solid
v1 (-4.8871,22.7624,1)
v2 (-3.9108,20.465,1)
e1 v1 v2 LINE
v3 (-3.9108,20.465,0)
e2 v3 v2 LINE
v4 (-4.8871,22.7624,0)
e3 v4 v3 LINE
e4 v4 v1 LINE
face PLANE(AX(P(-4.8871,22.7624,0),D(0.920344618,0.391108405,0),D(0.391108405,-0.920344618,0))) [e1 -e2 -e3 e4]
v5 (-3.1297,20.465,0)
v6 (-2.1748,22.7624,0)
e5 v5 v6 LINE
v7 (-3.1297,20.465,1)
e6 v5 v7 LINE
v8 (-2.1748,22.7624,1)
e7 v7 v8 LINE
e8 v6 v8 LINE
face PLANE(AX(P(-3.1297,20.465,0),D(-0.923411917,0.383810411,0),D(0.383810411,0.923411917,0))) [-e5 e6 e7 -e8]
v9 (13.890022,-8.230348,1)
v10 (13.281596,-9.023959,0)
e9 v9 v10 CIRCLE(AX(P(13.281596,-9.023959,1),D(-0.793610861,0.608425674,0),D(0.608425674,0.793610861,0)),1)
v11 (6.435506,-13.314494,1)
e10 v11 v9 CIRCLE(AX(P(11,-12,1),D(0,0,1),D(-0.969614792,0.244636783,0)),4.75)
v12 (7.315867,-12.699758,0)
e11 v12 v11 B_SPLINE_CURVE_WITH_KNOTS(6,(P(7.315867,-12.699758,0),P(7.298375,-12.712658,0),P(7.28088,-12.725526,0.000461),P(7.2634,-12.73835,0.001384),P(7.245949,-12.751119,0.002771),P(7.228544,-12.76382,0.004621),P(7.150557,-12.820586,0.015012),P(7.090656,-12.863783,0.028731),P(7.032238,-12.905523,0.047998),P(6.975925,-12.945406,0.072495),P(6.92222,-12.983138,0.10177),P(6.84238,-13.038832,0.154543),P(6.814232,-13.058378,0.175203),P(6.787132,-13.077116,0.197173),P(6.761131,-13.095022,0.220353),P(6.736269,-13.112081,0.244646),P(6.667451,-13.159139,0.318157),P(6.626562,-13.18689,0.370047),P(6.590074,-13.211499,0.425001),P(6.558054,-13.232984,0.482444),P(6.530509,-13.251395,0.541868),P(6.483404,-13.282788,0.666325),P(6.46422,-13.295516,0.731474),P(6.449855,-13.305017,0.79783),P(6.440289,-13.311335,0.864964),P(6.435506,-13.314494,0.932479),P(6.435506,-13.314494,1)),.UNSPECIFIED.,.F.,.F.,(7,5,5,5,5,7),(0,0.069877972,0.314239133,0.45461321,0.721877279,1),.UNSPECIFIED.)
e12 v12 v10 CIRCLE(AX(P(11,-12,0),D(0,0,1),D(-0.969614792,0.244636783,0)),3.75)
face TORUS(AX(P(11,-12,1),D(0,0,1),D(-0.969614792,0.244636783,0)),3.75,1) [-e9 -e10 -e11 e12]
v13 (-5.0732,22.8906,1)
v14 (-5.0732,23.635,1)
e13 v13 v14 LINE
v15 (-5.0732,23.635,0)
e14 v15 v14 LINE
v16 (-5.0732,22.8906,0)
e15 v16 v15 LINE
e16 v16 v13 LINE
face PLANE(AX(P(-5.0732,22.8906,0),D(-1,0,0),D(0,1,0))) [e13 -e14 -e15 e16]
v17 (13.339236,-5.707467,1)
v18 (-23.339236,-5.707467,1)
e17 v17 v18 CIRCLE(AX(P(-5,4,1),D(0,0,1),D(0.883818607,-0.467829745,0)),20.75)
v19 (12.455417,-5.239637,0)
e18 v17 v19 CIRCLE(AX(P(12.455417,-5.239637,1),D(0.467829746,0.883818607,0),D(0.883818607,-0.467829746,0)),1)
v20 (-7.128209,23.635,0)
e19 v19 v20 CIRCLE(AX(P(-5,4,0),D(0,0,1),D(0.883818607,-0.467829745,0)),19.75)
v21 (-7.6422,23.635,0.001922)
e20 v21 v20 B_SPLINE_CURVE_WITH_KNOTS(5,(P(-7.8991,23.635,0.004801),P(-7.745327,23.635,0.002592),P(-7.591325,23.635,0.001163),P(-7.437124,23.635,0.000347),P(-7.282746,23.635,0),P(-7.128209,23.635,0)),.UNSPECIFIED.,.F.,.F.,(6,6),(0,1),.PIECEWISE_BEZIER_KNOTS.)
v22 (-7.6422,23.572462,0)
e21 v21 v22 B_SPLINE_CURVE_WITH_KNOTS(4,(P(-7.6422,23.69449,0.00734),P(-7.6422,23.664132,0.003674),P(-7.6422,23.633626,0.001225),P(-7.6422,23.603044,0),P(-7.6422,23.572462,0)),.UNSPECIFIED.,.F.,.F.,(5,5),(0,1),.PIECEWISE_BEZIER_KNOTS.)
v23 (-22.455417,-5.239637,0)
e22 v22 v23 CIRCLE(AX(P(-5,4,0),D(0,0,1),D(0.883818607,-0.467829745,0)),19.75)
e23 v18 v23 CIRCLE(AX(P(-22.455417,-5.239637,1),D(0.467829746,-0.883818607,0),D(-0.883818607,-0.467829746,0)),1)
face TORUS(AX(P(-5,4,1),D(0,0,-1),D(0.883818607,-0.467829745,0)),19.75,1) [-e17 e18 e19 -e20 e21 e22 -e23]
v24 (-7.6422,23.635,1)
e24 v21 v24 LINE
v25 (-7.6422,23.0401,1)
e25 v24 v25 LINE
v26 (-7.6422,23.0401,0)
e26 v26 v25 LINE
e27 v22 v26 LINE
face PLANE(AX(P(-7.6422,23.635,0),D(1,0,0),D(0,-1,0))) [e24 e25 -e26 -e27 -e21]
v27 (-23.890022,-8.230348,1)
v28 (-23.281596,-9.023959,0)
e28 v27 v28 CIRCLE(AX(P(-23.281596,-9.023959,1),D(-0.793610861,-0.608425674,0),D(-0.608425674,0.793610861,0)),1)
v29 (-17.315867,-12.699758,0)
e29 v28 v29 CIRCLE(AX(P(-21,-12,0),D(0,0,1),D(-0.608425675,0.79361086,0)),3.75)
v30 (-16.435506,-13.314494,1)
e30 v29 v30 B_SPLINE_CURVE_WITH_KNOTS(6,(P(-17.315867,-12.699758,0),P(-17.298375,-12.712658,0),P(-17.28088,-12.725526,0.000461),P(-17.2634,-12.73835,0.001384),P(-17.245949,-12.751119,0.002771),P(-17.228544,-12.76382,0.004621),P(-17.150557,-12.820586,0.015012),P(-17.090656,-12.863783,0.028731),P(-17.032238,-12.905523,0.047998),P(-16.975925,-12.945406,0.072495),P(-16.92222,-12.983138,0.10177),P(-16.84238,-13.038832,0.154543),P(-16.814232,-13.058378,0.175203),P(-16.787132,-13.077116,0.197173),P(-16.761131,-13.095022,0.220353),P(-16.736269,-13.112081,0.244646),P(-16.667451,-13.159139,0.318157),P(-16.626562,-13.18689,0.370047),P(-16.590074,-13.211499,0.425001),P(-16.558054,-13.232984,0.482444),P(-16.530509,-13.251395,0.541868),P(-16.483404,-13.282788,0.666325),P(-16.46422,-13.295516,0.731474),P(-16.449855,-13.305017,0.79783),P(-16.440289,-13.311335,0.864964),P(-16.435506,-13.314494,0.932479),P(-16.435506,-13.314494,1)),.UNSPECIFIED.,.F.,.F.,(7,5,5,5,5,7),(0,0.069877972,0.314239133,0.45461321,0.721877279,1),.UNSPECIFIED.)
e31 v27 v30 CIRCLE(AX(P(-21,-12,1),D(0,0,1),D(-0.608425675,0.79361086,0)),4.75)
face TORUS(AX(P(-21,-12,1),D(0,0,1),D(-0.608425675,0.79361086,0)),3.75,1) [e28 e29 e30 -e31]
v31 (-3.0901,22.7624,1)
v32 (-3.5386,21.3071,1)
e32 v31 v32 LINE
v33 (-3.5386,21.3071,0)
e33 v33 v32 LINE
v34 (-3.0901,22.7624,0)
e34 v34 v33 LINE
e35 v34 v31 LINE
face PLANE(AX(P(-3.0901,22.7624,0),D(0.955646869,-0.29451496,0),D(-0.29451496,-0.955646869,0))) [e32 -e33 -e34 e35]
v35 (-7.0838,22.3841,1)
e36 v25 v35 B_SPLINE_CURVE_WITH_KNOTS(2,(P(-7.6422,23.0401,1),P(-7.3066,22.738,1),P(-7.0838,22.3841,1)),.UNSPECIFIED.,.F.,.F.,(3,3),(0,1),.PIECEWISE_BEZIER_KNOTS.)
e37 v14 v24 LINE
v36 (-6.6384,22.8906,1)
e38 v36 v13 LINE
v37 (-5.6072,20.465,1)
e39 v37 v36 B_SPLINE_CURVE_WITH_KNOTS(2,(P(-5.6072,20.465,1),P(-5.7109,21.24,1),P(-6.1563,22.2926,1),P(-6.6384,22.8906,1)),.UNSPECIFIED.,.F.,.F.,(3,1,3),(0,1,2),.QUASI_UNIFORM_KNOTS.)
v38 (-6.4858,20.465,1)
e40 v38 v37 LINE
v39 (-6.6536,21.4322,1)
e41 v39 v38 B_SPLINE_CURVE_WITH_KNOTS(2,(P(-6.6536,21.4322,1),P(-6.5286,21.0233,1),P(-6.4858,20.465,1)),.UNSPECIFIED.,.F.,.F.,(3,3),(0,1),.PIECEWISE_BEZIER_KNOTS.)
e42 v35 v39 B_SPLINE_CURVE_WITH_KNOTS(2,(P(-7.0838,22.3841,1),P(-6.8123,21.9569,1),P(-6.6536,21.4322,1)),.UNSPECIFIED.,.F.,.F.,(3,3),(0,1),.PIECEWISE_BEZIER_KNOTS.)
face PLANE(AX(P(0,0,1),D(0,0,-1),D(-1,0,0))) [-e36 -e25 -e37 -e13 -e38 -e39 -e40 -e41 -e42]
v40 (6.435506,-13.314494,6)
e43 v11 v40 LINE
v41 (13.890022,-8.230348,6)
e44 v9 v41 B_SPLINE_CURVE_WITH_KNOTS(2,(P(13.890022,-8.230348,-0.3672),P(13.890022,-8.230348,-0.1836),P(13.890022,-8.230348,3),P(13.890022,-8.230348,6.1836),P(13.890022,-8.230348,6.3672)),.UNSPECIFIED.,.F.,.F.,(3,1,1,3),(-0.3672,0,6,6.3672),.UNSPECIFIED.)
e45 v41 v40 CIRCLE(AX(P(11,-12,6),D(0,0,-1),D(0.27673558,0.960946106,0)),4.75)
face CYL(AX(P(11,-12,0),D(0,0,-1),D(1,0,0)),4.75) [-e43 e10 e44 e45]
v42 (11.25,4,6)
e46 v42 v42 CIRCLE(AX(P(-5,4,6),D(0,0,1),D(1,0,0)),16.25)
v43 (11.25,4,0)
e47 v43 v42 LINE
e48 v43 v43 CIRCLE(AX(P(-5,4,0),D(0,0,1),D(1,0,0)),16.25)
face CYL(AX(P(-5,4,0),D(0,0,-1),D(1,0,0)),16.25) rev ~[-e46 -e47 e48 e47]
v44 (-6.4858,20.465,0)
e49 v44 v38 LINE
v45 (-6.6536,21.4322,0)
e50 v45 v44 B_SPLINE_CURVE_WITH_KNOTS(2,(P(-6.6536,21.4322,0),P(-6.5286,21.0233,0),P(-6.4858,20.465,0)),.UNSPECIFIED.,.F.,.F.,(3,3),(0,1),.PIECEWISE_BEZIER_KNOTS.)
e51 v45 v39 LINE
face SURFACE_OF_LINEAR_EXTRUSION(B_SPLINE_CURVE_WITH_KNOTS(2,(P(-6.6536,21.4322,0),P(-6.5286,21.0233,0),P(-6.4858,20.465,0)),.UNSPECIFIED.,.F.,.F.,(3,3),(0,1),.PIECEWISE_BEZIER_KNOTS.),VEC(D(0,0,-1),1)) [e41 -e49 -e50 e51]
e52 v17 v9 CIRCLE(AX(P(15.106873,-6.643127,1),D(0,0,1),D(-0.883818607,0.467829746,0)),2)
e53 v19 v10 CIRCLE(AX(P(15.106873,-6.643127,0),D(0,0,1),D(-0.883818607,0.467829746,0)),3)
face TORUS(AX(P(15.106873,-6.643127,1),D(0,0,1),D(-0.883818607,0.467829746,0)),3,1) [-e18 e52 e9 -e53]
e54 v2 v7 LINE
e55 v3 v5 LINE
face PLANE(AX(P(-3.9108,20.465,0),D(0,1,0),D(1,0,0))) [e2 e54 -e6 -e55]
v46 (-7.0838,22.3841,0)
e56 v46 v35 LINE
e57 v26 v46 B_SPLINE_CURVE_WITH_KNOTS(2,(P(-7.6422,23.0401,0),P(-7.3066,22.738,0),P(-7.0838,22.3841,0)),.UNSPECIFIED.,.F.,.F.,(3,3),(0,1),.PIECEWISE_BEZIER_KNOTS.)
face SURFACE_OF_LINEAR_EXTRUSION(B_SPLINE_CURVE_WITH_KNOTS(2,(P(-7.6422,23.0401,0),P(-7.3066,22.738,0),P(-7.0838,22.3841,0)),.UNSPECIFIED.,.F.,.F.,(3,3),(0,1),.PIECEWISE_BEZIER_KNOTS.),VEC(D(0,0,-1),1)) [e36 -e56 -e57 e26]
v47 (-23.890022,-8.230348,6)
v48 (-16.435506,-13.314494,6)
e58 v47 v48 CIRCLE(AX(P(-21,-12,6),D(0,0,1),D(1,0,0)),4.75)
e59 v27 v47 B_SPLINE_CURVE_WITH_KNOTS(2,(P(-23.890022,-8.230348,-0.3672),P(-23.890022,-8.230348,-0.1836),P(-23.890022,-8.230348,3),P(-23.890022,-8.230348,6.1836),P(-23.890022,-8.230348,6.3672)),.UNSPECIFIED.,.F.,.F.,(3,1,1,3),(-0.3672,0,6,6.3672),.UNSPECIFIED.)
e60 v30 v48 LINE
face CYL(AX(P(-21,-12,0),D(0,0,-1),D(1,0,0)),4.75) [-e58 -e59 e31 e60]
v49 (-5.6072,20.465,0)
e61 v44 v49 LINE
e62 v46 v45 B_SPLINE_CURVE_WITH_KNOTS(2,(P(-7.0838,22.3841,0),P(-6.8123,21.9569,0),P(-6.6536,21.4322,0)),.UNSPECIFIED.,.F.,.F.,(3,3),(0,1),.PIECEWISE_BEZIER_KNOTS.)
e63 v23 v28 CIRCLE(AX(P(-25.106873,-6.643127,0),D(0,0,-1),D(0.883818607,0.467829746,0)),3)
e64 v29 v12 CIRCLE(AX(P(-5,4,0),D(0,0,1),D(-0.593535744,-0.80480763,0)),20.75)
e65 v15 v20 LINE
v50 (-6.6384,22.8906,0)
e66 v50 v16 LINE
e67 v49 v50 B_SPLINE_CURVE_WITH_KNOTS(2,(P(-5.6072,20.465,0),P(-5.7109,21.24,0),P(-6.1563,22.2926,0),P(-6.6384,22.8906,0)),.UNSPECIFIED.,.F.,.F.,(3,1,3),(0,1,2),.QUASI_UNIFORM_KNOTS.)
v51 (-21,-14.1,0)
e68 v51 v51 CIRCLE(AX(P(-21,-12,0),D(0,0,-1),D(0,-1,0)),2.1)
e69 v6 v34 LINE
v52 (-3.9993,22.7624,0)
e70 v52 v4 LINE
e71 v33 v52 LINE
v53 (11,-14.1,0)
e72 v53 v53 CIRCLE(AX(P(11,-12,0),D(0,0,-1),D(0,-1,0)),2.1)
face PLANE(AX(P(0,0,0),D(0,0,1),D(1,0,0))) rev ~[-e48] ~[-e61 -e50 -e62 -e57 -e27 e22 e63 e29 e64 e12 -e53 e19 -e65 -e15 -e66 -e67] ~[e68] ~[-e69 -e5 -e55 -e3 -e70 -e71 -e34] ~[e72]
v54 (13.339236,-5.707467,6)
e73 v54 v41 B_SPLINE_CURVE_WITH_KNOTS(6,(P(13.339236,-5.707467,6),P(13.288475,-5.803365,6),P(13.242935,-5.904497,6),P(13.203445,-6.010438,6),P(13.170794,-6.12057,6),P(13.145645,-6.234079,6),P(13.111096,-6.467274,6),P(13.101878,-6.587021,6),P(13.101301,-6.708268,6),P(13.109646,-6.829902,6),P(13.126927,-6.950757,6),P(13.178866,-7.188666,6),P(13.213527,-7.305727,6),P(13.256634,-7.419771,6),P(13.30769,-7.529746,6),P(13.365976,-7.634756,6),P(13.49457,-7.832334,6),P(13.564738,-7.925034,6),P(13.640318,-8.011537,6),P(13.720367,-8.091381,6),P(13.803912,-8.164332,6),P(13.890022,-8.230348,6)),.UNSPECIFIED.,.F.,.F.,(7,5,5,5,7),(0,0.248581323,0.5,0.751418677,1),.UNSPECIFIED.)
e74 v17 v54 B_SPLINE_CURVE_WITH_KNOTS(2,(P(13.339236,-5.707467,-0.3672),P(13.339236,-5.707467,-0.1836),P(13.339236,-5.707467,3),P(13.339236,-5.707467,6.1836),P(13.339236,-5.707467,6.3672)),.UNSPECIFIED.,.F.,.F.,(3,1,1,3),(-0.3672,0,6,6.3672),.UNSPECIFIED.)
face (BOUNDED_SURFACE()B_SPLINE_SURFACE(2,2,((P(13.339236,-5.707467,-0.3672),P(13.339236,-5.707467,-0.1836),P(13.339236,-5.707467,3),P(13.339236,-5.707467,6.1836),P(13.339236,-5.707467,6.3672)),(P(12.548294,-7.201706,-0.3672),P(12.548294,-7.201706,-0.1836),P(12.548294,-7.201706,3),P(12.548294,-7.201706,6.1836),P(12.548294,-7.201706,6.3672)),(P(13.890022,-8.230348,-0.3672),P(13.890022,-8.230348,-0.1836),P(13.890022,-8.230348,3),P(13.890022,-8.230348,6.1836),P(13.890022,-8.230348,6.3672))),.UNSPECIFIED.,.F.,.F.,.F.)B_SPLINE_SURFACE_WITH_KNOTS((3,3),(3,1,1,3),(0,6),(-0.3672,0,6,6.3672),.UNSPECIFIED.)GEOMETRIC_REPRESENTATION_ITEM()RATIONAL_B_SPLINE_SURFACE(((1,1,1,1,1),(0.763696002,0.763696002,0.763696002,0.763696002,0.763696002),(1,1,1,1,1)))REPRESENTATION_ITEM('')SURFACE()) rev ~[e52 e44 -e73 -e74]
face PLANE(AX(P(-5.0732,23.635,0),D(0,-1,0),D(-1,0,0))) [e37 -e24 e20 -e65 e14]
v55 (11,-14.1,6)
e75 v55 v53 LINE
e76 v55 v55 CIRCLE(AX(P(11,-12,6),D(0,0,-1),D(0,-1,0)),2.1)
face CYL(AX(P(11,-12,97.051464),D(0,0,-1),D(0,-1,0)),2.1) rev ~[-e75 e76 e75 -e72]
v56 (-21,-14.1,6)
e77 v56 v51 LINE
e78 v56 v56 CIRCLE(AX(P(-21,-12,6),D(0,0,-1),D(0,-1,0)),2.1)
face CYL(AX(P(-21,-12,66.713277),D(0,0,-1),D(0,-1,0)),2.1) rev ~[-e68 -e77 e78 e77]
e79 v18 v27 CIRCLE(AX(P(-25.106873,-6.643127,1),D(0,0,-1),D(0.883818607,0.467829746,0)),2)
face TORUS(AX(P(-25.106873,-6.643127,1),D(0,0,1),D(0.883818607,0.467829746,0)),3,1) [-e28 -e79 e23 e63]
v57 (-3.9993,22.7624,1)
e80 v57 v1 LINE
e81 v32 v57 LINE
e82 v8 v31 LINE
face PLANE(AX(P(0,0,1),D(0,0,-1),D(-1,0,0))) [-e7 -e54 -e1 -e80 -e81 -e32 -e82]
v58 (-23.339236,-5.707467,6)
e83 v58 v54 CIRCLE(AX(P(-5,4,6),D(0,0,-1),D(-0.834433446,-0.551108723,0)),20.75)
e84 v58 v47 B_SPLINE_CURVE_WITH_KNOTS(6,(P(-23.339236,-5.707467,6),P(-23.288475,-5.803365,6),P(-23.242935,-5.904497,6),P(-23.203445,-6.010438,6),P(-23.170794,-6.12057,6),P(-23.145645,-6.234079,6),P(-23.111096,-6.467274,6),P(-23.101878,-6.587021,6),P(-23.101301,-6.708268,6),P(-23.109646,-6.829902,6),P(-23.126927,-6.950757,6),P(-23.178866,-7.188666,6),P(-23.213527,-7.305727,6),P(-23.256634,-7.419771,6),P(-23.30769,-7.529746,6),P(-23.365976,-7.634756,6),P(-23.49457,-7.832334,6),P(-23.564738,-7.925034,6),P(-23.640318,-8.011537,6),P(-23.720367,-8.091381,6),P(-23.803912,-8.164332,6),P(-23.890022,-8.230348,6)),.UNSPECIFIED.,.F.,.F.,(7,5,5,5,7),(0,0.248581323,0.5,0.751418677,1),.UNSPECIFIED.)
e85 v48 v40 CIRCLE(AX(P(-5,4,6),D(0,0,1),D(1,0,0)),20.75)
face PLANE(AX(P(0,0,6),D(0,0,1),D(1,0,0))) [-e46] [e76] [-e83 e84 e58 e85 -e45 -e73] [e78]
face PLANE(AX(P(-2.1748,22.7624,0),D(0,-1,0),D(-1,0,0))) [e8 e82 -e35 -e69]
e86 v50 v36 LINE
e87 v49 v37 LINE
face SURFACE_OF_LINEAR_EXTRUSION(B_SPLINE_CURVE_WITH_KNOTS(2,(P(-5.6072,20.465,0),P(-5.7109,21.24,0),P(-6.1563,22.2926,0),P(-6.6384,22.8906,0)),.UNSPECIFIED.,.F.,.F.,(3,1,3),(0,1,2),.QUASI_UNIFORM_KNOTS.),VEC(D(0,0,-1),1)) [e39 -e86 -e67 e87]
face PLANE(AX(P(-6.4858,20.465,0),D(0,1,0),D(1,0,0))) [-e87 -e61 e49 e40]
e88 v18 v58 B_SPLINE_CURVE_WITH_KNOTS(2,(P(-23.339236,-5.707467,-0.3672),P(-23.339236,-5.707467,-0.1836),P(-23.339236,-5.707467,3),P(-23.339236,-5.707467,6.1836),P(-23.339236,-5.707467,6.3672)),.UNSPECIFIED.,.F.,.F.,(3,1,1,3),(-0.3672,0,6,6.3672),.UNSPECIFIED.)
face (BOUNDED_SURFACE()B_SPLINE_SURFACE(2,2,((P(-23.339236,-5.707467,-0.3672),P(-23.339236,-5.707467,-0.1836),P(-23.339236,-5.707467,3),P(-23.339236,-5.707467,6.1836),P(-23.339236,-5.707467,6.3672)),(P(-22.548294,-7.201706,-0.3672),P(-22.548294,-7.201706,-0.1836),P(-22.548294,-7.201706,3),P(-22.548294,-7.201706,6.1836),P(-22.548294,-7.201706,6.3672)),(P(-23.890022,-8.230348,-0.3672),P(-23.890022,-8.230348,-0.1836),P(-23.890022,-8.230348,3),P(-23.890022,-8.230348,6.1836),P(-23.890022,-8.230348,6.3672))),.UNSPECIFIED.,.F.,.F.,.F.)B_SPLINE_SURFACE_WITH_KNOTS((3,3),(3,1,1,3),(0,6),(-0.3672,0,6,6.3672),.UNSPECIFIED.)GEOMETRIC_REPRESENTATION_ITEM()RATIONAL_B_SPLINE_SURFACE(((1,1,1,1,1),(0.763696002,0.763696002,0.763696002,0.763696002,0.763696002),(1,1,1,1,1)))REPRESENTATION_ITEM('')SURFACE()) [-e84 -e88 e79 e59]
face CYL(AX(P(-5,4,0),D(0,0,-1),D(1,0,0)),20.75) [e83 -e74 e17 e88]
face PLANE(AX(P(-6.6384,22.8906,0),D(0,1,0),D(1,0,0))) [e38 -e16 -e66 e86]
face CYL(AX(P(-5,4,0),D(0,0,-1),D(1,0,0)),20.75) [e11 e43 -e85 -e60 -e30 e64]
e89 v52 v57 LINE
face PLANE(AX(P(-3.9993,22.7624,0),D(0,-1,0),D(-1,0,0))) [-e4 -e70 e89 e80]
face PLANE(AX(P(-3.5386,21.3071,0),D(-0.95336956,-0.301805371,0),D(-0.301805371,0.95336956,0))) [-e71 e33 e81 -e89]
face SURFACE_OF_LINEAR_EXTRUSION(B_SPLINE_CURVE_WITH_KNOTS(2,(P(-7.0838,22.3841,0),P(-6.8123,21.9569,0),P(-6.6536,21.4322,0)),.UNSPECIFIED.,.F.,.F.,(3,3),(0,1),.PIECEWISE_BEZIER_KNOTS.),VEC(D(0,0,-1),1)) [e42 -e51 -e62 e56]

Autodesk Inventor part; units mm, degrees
ref_plane "YZ Plane" through (0, 0, 0) normal (1, 0, 0) x (0, 1, 0)
ref_plane "XZ Plane" through (0, 0, 0) normal (0, 1, 0) x (-1, 0, 0)
sketch "Sketch1: base" plane through (0, 0, 0) normal (0, 0, 1) x (1, 0, 0)
  circle A0 centre (-5, 4) radius 16.25
  circle A1 centre (-5, 4) radius 20.75
  circle A2 centre (-21, -12) radius 4.75
  circle A3 centre (11, -12) radius 4.75
  line L0 (-21, -12) -> (11, -12) construction
  line L1 (-21, 20) -> (-21, -12) construction
  point P0 (0, 0)
  point P1 (-5, -12)
  point P2 (-21, 4)
  point P3 (-22.3145, -7.4355)
  point P4 (-16.4355, -13.3145)
  point P5 (6.4355, -13.3145)
  point P6 (12.3145, -7.4355)
  dimension "d0" = 9.5
  dimension "d1" = 32
  dimension "d2" = 41.5
  dimension "d3" = 32.5
  dimension "d4" = 32
sketch "Sketch2: tube stopper" plane through (0, 0, 0) normal (0, 0, 1) x (1, 0, 0)
  circle A0 centre (-5, 4) radius 14.875
  circle A1 centre (-5, 4) radius 16.25 projected
  point P0 (0, 0)
  dimension "d14" = 29.75
extrude "Ex1: base" add sketch "Sketch1: base" along normal blind 6
ref_plane "Work Plane2" through (0, 0, 0) normal (0, 0, 1) x (1, 0, 0)
sketch "Sketch: text" plane through (0, 0, 0) normal (0, 0, -1) x (-1, 0, 0)
  line L0 (3.25, 23.8) -> (6.75, 23.8) construction
  line L1 (6.75, 23.8) -> (6.75, 20.3) construction
  line L2 (6.75, 20.3) -> (3.25, 20.3) construction
  line L3 (3.25, 20.3) -> (3.25, 23.8) construction
  line L4 (2.1748, 22.7624) -> (3.0901, 22.7624)
  line L5 (3.0901, 22.7624) -> (3.5386, 21.3071)
  line L6 (3.5386, 21.3071) -> (3.9993, 22.7624)
  line L7 (3.9993, 22.7624) -> (4.8871, 22.7624)
  line L8 (4.8871, 22.7624) -> (3.9108, 20.465)
  line L9 (3.9108, 20.465) -> (3.1297, 20.465)
  line L10 (3.1297, 20.465) -> (2.1748, 22.7624)
  line L11 (5.0732, 23.635) -> (7.6422, 23.635)
  line L12 (7.6422, 23.635) -> (7.6422, 23.0401)
  spline S0 degree 2 poles (7.6422, 23.0401) (7.3066, 22.738) (7.0838, 22.3841) knots 0 0 0 1 1 1
  spline S1 degree 2 poles (7.0838, 22.3841) (6.8123, 21.9569) (6.6536, 21.4322) knots 0 0 0 1 1 1
  spline S2 degree 2 poles (6.6536, 21.4322) (6.5286, 21.0233) (6.4858, 20.465) knots 0 0 0 1 1 1
  line L13 (6.4858, 20.465) -> (5.6072, 20.465)
  spline S3 degree 2 poles (5.6072, 20.465) (5.7109, 21.24) (6.1563, 22.2926) (6.6384, 22.8906) knots 0 0 0 1 2 2 2
  line L14 (6.6384, 22.8906) -> (5.0732, 22.8906)
  line L15 (5.0732, 22.8906) -> (5.0732, 23.635)
  point P0 (0, 0)
  point P1 (5, 4)
  point P2 (5, 20.3)
  dimension "d22" = 3.5
  dimension "d23" = 16.3
hole "Hole1: M3 heat-sets" at (11, -12, 0) at (-21, -12, 0) direction (0, 0, -1) diameter 4.2 end through all both
extrude "Ex: tube stopper" [suppressed]
fillet "Fillet1" radius 2 2 edges at (12.3145, -7.4355, 3) (-22.3145, -7.4355, 3)
fillet "Fillet2" radius 1 5 edges at (-23.1529, -7.0697, 0) (-23.6764, -15.9242, 0) (13.1529, -7.0697, 0) (13.6764, -15.9242, 0) (-5, 24.75, 0)
extrude "Ex: text" cut sketch "Sketch: text" against normal blind 1 from surface at 0
properties part number "cage_inside_07"
